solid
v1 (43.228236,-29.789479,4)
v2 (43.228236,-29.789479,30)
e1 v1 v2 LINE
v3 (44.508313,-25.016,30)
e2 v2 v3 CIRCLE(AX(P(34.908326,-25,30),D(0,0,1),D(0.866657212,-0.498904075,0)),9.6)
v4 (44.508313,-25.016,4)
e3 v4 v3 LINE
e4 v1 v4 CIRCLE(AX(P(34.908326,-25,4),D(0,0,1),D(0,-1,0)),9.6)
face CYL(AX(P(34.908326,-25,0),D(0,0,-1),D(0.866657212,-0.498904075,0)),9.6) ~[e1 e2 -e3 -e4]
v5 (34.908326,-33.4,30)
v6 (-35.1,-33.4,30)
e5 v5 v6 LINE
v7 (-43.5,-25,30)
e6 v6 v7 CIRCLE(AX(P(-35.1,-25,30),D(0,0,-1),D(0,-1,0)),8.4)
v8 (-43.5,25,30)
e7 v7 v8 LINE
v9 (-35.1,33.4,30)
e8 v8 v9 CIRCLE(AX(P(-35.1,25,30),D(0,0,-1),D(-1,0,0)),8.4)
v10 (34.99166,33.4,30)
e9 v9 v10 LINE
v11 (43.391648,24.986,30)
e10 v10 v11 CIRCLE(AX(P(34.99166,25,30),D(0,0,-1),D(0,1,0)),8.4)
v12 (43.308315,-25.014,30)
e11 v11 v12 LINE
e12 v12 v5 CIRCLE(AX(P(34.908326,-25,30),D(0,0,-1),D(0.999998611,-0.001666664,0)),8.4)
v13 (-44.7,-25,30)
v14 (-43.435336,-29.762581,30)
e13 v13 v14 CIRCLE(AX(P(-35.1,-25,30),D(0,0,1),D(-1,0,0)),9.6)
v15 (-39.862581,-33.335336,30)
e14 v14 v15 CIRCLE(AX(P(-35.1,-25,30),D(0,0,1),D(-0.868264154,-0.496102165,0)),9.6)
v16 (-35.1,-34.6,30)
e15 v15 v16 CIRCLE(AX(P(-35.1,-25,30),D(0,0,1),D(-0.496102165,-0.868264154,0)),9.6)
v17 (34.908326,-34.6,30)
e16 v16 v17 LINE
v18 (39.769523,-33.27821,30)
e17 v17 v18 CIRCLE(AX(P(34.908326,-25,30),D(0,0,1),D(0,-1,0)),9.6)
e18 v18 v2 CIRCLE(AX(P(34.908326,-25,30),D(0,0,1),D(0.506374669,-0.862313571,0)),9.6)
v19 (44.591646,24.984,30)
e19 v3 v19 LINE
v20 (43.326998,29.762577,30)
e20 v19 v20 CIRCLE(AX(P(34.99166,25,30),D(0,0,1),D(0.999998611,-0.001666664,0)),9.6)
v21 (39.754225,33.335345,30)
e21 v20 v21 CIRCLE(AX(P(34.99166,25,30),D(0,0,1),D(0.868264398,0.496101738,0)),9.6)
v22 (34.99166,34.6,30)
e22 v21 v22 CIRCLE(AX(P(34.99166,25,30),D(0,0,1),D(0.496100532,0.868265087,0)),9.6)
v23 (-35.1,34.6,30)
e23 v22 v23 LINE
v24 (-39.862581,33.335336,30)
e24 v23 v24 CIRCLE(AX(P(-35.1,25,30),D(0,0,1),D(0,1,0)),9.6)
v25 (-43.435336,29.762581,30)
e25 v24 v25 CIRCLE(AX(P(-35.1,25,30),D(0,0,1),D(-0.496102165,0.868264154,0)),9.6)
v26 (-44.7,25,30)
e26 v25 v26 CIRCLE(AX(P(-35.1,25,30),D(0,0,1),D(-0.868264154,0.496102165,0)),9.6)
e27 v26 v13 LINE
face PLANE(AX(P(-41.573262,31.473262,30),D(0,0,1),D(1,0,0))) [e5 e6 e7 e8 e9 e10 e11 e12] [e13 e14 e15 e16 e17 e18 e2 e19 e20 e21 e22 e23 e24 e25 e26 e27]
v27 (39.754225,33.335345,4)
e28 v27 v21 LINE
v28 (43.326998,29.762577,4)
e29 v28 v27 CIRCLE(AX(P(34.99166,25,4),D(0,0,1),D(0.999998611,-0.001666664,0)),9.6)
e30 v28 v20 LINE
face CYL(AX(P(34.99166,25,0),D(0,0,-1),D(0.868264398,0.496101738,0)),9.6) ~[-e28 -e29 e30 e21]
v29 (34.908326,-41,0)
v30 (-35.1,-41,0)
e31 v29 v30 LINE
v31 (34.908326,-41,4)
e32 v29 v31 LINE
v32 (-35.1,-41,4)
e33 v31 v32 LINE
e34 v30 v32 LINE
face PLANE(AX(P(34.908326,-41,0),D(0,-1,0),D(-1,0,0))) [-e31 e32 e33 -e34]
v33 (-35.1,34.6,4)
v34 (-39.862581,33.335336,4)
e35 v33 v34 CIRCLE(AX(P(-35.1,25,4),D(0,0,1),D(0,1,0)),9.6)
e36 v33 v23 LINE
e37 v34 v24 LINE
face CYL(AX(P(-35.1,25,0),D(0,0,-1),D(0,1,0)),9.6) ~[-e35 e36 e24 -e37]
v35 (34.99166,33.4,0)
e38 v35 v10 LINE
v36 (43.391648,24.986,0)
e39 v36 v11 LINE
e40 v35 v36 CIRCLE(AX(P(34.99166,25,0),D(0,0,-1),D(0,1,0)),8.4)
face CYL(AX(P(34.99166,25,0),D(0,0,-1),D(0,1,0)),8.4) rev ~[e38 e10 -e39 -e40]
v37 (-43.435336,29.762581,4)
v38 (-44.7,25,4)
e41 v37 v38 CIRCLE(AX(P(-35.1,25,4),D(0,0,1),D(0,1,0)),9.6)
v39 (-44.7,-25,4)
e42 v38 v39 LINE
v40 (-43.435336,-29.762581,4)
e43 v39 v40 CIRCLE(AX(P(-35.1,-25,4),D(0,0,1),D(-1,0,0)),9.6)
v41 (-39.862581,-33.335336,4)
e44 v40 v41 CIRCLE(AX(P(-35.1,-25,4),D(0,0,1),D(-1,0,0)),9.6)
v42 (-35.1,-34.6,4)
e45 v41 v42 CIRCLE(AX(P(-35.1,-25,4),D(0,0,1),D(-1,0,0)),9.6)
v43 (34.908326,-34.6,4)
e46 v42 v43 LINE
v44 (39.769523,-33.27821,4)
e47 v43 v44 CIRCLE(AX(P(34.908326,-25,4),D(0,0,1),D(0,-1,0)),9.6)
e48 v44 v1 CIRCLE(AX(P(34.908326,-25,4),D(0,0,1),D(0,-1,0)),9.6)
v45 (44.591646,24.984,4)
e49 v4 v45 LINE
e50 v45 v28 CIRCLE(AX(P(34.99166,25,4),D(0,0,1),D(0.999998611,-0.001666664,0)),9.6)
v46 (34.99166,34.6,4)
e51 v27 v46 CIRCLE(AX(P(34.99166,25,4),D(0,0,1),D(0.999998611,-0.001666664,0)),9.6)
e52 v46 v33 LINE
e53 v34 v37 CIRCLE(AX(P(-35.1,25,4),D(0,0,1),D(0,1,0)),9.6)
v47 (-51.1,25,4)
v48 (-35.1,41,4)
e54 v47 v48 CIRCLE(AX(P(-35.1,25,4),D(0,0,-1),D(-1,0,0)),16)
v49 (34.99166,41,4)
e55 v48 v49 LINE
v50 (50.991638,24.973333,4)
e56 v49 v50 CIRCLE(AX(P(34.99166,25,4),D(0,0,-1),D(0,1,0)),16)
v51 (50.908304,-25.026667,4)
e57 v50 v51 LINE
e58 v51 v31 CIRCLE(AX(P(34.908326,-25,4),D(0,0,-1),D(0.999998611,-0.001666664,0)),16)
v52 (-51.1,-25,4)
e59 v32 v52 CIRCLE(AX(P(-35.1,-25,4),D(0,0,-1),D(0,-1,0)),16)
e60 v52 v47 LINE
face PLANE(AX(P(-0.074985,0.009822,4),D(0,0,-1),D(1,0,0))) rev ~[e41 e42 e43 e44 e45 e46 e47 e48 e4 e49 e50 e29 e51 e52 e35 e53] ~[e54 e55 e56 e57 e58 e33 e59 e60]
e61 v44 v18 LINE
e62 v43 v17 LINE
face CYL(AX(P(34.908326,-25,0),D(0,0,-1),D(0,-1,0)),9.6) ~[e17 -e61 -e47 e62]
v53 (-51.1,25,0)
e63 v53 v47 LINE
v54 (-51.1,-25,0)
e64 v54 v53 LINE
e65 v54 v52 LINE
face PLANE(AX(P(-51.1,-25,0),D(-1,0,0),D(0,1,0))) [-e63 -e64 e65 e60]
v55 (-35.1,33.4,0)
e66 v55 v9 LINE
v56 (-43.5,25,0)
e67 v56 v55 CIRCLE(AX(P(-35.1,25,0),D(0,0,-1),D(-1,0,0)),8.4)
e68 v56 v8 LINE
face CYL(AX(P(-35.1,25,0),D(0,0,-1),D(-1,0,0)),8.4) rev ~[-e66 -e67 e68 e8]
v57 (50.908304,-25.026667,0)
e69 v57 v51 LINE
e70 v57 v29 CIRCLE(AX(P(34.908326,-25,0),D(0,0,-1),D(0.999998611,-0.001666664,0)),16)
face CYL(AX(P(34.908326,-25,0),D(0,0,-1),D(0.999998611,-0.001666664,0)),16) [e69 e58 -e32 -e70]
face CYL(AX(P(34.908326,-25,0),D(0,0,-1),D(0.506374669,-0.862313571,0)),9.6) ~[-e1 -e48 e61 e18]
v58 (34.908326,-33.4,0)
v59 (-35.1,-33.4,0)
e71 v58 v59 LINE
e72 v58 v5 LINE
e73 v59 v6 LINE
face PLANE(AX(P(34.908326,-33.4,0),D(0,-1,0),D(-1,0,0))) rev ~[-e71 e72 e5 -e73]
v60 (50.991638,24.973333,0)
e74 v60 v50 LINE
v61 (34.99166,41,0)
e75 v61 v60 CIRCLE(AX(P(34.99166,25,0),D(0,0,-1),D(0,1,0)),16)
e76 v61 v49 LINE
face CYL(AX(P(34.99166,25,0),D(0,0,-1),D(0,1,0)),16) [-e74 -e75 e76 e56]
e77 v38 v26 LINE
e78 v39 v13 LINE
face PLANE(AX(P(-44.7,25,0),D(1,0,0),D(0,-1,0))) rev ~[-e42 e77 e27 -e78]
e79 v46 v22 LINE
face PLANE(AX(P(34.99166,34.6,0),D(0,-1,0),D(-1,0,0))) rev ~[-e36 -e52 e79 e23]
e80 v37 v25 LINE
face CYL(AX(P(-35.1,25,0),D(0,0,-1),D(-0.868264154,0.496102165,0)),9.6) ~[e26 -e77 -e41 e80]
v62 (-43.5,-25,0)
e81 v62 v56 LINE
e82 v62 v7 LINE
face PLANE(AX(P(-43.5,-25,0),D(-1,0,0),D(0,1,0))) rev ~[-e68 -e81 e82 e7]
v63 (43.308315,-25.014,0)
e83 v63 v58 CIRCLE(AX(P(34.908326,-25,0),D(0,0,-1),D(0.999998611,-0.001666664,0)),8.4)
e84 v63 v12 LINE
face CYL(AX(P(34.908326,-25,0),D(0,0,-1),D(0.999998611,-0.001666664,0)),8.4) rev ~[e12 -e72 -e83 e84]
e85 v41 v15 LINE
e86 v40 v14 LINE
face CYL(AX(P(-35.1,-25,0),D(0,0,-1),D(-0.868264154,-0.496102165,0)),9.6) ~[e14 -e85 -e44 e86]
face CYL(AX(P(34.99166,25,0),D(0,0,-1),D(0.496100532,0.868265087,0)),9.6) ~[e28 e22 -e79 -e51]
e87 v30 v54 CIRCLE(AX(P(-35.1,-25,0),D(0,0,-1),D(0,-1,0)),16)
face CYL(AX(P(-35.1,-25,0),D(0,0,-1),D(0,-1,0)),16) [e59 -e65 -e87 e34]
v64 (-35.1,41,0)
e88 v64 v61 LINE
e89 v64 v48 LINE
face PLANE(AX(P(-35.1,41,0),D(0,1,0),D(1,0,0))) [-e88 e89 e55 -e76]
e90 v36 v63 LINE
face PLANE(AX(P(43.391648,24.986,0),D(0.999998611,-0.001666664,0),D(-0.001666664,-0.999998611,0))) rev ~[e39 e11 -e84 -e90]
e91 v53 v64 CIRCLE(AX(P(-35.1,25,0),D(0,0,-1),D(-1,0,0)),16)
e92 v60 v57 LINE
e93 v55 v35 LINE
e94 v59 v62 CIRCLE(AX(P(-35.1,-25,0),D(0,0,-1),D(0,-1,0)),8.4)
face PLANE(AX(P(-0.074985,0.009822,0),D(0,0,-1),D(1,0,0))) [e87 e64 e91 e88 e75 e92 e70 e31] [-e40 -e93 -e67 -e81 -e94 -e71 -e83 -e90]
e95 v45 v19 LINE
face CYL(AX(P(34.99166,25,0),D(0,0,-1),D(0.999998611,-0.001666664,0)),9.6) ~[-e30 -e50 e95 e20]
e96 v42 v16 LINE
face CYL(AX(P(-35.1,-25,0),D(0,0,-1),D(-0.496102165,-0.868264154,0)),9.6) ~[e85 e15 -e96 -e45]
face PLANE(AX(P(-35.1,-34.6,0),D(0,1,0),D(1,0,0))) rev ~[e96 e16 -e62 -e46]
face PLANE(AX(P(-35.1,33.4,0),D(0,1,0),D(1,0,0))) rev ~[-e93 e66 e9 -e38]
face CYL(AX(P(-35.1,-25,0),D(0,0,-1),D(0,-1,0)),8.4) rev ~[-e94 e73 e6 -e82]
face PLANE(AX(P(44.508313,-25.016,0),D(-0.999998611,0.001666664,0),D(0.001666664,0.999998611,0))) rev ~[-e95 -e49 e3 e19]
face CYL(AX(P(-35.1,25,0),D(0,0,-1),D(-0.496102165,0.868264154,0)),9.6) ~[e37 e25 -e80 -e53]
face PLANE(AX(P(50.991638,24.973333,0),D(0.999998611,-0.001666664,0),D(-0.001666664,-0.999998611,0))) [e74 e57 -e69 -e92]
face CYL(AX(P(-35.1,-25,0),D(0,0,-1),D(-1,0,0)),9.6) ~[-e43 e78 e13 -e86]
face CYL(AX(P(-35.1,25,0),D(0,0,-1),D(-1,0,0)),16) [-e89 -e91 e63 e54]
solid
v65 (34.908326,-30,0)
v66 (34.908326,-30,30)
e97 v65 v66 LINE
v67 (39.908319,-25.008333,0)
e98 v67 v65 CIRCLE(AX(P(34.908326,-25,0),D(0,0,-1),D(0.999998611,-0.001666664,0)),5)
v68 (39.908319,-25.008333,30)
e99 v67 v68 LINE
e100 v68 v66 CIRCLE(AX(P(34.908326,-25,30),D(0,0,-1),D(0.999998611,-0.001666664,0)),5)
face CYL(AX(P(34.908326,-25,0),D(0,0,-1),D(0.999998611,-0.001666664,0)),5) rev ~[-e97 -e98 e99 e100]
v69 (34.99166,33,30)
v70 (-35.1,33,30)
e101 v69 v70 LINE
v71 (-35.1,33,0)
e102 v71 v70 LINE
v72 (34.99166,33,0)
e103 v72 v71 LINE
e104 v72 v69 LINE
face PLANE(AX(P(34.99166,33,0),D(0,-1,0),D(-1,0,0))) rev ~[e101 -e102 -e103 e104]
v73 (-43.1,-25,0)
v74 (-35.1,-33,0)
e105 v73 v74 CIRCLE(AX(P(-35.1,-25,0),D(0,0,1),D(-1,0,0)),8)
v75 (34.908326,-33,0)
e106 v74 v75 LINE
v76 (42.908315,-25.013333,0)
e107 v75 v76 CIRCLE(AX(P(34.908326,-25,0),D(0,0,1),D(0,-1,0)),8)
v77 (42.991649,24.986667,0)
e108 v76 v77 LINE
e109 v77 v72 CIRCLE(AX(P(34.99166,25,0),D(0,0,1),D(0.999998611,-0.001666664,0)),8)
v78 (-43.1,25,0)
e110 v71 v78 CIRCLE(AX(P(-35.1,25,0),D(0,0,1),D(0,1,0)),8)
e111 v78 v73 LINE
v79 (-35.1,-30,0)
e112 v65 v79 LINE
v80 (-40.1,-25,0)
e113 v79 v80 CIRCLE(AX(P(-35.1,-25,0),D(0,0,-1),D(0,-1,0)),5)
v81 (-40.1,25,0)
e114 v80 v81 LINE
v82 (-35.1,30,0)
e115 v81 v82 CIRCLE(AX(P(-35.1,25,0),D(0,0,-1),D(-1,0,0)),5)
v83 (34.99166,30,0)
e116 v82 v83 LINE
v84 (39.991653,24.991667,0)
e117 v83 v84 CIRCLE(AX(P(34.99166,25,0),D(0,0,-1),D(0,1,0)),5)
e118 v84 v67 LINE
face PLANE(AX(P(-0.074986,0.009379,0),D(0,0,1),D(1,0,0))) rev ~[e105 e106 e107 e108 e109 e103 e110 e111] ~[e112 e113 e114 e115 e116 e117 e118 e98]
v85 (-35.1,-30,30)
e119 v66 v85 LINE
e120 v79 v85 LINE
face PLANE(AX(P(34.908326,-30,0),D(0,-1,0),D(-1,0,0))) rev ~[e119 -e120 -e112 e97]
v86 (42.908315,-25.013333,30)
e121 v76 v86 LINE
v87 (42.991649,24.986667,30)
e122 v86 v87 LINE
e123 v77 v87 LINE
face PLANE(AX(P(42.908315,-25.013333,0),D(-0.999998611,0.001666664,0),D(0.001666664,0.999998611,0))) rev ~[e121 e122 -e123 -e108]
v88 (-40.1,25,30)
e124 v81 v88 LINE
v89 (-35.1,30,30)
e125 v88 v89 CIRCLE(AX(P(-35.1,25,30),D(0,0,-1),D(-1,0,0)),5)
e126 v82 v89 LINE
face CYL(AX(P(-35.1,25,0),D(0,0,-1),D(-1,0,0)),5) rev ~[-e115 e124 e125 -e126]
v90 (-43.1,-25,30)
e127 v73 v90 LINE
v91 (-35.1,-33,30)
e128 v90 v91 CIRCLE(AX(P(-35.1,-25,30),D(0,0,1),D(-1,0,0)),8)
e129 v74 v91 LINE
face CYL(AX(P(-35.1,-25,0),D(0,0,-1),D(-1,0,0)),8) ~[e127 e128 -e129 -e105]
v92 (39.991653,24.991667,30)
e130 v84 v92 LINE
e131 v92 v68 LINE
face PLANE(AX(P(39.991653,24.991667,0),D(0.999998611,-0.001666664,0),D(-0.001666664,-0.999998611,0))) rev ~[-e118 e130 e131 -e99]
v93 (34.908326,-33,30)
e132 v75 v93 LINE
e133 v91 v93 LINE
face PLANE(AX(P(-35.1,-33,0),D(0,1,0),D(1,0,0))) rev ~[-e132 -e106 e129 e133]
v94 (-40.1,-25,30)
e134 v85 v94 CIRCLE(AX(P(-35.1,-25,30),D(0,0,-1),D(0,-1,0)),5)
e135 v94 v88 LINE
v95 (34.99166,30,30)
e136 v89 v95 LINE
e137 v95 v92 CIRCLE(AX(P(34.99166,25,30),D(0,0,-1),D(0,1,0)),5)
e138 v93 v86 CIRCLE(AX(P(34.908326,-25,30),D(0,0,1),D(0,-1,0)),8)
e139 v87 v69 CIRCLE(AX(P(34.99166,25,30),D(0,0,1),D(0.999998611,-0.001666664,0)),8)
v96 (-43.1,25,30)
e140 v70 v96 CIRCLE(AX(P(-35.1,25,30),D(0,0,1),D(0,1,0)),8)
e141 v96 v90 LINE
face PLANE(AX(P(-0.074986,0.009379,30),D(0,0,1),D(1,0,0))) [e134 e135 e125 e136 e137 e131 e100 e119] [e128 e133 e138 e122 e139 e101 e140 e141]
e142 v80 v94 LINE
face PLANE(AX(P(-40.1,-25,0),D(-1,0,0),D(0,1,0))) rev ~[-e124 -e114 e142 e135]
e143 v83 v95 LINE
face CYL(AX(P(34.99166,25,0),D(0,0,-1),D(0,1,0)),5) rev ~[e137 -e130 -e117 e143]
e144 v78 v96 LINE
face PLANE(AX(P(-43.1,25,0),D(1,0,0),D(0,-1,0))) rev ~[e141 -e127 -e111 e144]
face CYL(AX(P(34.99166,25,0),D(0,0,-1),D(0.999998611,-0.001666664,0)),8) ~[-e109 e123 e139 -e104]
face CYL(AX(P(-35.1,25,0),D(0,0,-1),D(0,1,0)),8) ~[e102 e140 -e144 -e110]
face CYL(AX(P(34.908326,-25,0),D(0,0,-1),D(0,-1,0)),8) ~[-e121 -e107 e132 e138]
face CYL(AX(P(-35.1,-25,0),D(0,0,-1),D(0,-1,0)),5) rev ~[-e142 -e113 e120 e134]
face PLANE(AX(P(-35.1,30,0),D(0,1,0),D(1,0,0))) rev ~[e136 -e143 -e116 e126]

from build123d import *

# Parameters (mm, degrees)
F1_DEPTH = 30
F2_DEPTH = 30
F4_DEPTH = 4


# Not quite as in the source:
# - a feature of the source that left no trace in its solid (it failed there, or was rolled back) is left out


with BuildPart() as f1:
    # F0 (on Top) → F1 (new body)
    with BuildSketch(Plane.XY):
        with BuildLine():
            Line((34.9916597222, 33), (-35.1, 33))
            ThreePointArc((-35.1, 33), (-40.7568542495, 30.6568542495), (-43.1, 25))
            Line((-43.1, 25), (-43.1, -25))
            ThreePointArc((-43.1, -25), (-40.7568542495, -30.6568542495), (-35.1, -33))
            Line((-35.1, -33), (34.9083263889, -33))
            ThreePointArc((34.9083263889, -33), (40.5604646339, -30.6615663256), (42.9083152778, -25.0133333148))
            Line((42.9083152778, -25.0133333148), (42.9916486111, 24.9866666852))
            ThreePointArc((42.9916486111, 24.9866666852), (40.6532260478, 30.652138245), (34.9916597222, 33))
        make_face()
        with BuildLine():
            Line((34.9083263889, -30), (-35.1, -30))
            ThreePointArc((-35.1, -30), (-38.6355339059, -28.5355339059), (-40.1, -25))
            Line((-40.1, -25), (-40.1, 25))
            ThreePointArc((-40.1, 25), (-38.6355339059, 28.5355339059), (-35.1, 30))
            Line((-35.1, 30), (34.9916597222, 30))
            ThreePointArc((34.9916597222, 30), (38.5301386757, 28.5325864031), (39.9916527778, 24.9916666782))
            Line((39.9916527778, 24.9916666782), (39.9083194445, -25.0083333218))
            ThreePointArc((39.9083194445, -25.0083333218), (38.440912792, -28.5384789535), (34.9083263889, -30))
        make_face(mode=Mode.SUBTRACT)
    extrude(amount=F1_DEPTH)


with BuildPart() as f2:
    # F0 (on Top) → F2 (new body)
    with BuildSketch(Plane.XY):
        with BuildLine():
            ThreePointArc((-43.4353358825, 29.7625807841), (-41.1644660941, 31.0644660941), (-39.8625807841, 33.3353358825))
            ThreePointArc((-39.8625807841, 33.3353358825), (-41.8882250994, 31.7882250994), (-43.4353358825, 29.7625807841))
        make_face()
        with BuildLine():
            ThreePointArc((-39.8625807841, -33.3353358825), (-41.1644660941, -31.0644660941), (-43.4353358825, -29.7625807841))
            ThreePointArc((-43.4353358825, -29.7625807841), (-41.8882250994, -31.7882250994), (-39.8625807841, -33.3353358825))
        make_face()
        with BuildLine():
            ThreePointArc((43.3269979462, 29.7625766863), (41.7798801076, 31.7882298134), (39.7542248316, 33.3353448386))
            ThreePointArc((39.7542248316, 33.3353448386), (41.0561149382, 31.0644636388), (43.3269979462, 29.7625766863))
        make_face()
        with BuildLine():
            ThreePointArc((39.7695232115, -33.2782102807), (41.7258186338, -31.7588312222), (43.228235626, -29.7894791247))
            ThreePointArc((43.228235626, -29.7894791247), (41.040869178, -31.0797754051), (39.7695232115, -33.2782102807))
        make_face()
        with BuildLine():
            Line((34.9916597222, 34.6), (-35.1, 34.6))
            ThreePointArc((-35.1, 34.6), (-37.5638156919, 34.2784488055), (-39.8625807841, 33.3353358825))
            ThreePointArc((-39.8625807841, 33.3353358825), (-41.1644660941, 31.0644660941), (-43.4353358825, 29.7625807841))
            ThreePointArc((-43.4353358825, 29.7625807841), (-44.3784488055, 27.4638156919), (-44.7, 25))
            Line((-44.7, 25), (-44.7, -25))
            ThreePointArc((-44.7, -25), (-44.3784488055, -27.4638156919), (-43.4353358825, -29.7625807841))
            ThreePointArc((-43.4353358825, -29.7625807841), (-41.1644660941, -31.0644660941), (-39.8625807841, -33.3353358825))
            ThreePointArc((-39.8625807841, -33.3353358825), (-37.5638156919, -34.2784488055), (-35.1, -34.6))
            Line((-35.1, -34.6), (34.9083263889, -34.6))
            ThreePointArc((34.9083263889, -34.6), (37.4271734769, -34.2636606883), (39.7695232115, -33.2782102807))
            ThreePointArc((39.7695232115, -33.2782102807), (41.040869178, -31.0797754051), (43.228235626, -29.7894791247))
            ThreePointArc((43.228235626, -29.7894791247), (44.1807151368, -27.4865250667), (44.5083130556, -25.0159999778))
            Line((44.5083130556, -25.0159999778), (44.5916463889, 24.9840000222))
            ThreePointArc((44.5916463889, 24.9840000222), (44.2721590874, 27.4560805226), (43.3269979462, 29.7625766863))
            ThreePointArc((43.3269979462, 29.7625766863), (41.0561149382, 31.0644636388), (39.7542248316, 33.3353448386))
            ThreePointArc((39.7542248316, 33.3353448386), (37.45546669, 34.2784511221), (34.9916597222, 34.6))
        make_face()
        with BuildLine():
            ThreePointArc((-43.5, 25), (-41.039696962, 30.939696962), (-35.1, 33.4))
            Line((-35.1, 33.4), (34.9916597222, 33.4))
            ThreePointArc((34.9916597222, 33.4), (40.9363043641, 30.9347451573), (43.3916480556, 24.9860000194))
            Line((43.3916480556, 24.9860000194), (43.3083147223, -25.0139999806))
            ThreePointArc((43.3083147223, -25.0139999806), (40.8430715462, -30.9446446419), (34.9083263889, -33.4))
            Line((34.9083263889, -33.4), (-35.1, -33.4))
            ThreePointArc((-35.1, -33.4), (-41.039696962, -30.939696962), (-43.5, -25))
            Line((-43.5, -25), (-43.5, 25))
        make_face(mode=Mode.SUBTRACT)
    extrude(amount=F2_DEPTH)

    # F3 (on face) → F4 (join)
    with BuildSketch(Plane(origin=(0, 0, 0), x_dir=(1, 0, 0), z_dir=(0, 0, -1))):
        with BuildLine():
            ThreePointArc((-35.1, 41), (-46.413708499, 36.313708499), (-51.1, 25))
            Line((-51.1, 25), (-51.1, -25))
            ThreePointArc((-51.1, -25), (-46.413708499, -36.313708499), (-35.1, -41))
            Line((-35.1, -41), (34.9916597222, -41))
            ThreePointArc((34.9916597222, -41), (46.3147923734, -36.30427649), (50.9916375001, -24.9733333704))
            Line((50.9916375001, -24.9733333704), (50.9083041667, 25.0266666296))
            ThreePointArc((50.9083041667, 25.0266666296), (46.2126028789, 36.3231326512), (34.9083263889, 41))
            Line((34.9083263889, 41), (-35.1, 41))
        make_face()
        with BuildLine():
            Line((-44.7, -25), (-44.7, 25))
            ThreePointArc((-44.7, 25), (-41.8882250994, 31.7882250994), (-35.1, 34.6))
            Line((-35.1, 34.6), (34.9083263889, 34.6))
            ThreePointArc((34.9083263889, 34.6), (41.6908922829, 31.7938795907), (44.5083130556, 25.0159999778))
            Line((44.5083130556, 25.0159999778), (44.5916463889, -24.9840000222))
            ThreePointArc((44.5916463889, -24.9840000222), (41.785539313, -31.782565894), (34.9916597222, -34.6))
            Line((34.9916597222, -34.6), (-35.1, -34.6))
            ThreePointArc((-35.1, -34.6), (-41.8882250994, -31.7882250994), (-44.7, -25))
        make_face(mode=Mode.SUBTRACT)
    extrude(amount=-F4_DEPTH)


solid = Compound([f1.part, f2.part])
